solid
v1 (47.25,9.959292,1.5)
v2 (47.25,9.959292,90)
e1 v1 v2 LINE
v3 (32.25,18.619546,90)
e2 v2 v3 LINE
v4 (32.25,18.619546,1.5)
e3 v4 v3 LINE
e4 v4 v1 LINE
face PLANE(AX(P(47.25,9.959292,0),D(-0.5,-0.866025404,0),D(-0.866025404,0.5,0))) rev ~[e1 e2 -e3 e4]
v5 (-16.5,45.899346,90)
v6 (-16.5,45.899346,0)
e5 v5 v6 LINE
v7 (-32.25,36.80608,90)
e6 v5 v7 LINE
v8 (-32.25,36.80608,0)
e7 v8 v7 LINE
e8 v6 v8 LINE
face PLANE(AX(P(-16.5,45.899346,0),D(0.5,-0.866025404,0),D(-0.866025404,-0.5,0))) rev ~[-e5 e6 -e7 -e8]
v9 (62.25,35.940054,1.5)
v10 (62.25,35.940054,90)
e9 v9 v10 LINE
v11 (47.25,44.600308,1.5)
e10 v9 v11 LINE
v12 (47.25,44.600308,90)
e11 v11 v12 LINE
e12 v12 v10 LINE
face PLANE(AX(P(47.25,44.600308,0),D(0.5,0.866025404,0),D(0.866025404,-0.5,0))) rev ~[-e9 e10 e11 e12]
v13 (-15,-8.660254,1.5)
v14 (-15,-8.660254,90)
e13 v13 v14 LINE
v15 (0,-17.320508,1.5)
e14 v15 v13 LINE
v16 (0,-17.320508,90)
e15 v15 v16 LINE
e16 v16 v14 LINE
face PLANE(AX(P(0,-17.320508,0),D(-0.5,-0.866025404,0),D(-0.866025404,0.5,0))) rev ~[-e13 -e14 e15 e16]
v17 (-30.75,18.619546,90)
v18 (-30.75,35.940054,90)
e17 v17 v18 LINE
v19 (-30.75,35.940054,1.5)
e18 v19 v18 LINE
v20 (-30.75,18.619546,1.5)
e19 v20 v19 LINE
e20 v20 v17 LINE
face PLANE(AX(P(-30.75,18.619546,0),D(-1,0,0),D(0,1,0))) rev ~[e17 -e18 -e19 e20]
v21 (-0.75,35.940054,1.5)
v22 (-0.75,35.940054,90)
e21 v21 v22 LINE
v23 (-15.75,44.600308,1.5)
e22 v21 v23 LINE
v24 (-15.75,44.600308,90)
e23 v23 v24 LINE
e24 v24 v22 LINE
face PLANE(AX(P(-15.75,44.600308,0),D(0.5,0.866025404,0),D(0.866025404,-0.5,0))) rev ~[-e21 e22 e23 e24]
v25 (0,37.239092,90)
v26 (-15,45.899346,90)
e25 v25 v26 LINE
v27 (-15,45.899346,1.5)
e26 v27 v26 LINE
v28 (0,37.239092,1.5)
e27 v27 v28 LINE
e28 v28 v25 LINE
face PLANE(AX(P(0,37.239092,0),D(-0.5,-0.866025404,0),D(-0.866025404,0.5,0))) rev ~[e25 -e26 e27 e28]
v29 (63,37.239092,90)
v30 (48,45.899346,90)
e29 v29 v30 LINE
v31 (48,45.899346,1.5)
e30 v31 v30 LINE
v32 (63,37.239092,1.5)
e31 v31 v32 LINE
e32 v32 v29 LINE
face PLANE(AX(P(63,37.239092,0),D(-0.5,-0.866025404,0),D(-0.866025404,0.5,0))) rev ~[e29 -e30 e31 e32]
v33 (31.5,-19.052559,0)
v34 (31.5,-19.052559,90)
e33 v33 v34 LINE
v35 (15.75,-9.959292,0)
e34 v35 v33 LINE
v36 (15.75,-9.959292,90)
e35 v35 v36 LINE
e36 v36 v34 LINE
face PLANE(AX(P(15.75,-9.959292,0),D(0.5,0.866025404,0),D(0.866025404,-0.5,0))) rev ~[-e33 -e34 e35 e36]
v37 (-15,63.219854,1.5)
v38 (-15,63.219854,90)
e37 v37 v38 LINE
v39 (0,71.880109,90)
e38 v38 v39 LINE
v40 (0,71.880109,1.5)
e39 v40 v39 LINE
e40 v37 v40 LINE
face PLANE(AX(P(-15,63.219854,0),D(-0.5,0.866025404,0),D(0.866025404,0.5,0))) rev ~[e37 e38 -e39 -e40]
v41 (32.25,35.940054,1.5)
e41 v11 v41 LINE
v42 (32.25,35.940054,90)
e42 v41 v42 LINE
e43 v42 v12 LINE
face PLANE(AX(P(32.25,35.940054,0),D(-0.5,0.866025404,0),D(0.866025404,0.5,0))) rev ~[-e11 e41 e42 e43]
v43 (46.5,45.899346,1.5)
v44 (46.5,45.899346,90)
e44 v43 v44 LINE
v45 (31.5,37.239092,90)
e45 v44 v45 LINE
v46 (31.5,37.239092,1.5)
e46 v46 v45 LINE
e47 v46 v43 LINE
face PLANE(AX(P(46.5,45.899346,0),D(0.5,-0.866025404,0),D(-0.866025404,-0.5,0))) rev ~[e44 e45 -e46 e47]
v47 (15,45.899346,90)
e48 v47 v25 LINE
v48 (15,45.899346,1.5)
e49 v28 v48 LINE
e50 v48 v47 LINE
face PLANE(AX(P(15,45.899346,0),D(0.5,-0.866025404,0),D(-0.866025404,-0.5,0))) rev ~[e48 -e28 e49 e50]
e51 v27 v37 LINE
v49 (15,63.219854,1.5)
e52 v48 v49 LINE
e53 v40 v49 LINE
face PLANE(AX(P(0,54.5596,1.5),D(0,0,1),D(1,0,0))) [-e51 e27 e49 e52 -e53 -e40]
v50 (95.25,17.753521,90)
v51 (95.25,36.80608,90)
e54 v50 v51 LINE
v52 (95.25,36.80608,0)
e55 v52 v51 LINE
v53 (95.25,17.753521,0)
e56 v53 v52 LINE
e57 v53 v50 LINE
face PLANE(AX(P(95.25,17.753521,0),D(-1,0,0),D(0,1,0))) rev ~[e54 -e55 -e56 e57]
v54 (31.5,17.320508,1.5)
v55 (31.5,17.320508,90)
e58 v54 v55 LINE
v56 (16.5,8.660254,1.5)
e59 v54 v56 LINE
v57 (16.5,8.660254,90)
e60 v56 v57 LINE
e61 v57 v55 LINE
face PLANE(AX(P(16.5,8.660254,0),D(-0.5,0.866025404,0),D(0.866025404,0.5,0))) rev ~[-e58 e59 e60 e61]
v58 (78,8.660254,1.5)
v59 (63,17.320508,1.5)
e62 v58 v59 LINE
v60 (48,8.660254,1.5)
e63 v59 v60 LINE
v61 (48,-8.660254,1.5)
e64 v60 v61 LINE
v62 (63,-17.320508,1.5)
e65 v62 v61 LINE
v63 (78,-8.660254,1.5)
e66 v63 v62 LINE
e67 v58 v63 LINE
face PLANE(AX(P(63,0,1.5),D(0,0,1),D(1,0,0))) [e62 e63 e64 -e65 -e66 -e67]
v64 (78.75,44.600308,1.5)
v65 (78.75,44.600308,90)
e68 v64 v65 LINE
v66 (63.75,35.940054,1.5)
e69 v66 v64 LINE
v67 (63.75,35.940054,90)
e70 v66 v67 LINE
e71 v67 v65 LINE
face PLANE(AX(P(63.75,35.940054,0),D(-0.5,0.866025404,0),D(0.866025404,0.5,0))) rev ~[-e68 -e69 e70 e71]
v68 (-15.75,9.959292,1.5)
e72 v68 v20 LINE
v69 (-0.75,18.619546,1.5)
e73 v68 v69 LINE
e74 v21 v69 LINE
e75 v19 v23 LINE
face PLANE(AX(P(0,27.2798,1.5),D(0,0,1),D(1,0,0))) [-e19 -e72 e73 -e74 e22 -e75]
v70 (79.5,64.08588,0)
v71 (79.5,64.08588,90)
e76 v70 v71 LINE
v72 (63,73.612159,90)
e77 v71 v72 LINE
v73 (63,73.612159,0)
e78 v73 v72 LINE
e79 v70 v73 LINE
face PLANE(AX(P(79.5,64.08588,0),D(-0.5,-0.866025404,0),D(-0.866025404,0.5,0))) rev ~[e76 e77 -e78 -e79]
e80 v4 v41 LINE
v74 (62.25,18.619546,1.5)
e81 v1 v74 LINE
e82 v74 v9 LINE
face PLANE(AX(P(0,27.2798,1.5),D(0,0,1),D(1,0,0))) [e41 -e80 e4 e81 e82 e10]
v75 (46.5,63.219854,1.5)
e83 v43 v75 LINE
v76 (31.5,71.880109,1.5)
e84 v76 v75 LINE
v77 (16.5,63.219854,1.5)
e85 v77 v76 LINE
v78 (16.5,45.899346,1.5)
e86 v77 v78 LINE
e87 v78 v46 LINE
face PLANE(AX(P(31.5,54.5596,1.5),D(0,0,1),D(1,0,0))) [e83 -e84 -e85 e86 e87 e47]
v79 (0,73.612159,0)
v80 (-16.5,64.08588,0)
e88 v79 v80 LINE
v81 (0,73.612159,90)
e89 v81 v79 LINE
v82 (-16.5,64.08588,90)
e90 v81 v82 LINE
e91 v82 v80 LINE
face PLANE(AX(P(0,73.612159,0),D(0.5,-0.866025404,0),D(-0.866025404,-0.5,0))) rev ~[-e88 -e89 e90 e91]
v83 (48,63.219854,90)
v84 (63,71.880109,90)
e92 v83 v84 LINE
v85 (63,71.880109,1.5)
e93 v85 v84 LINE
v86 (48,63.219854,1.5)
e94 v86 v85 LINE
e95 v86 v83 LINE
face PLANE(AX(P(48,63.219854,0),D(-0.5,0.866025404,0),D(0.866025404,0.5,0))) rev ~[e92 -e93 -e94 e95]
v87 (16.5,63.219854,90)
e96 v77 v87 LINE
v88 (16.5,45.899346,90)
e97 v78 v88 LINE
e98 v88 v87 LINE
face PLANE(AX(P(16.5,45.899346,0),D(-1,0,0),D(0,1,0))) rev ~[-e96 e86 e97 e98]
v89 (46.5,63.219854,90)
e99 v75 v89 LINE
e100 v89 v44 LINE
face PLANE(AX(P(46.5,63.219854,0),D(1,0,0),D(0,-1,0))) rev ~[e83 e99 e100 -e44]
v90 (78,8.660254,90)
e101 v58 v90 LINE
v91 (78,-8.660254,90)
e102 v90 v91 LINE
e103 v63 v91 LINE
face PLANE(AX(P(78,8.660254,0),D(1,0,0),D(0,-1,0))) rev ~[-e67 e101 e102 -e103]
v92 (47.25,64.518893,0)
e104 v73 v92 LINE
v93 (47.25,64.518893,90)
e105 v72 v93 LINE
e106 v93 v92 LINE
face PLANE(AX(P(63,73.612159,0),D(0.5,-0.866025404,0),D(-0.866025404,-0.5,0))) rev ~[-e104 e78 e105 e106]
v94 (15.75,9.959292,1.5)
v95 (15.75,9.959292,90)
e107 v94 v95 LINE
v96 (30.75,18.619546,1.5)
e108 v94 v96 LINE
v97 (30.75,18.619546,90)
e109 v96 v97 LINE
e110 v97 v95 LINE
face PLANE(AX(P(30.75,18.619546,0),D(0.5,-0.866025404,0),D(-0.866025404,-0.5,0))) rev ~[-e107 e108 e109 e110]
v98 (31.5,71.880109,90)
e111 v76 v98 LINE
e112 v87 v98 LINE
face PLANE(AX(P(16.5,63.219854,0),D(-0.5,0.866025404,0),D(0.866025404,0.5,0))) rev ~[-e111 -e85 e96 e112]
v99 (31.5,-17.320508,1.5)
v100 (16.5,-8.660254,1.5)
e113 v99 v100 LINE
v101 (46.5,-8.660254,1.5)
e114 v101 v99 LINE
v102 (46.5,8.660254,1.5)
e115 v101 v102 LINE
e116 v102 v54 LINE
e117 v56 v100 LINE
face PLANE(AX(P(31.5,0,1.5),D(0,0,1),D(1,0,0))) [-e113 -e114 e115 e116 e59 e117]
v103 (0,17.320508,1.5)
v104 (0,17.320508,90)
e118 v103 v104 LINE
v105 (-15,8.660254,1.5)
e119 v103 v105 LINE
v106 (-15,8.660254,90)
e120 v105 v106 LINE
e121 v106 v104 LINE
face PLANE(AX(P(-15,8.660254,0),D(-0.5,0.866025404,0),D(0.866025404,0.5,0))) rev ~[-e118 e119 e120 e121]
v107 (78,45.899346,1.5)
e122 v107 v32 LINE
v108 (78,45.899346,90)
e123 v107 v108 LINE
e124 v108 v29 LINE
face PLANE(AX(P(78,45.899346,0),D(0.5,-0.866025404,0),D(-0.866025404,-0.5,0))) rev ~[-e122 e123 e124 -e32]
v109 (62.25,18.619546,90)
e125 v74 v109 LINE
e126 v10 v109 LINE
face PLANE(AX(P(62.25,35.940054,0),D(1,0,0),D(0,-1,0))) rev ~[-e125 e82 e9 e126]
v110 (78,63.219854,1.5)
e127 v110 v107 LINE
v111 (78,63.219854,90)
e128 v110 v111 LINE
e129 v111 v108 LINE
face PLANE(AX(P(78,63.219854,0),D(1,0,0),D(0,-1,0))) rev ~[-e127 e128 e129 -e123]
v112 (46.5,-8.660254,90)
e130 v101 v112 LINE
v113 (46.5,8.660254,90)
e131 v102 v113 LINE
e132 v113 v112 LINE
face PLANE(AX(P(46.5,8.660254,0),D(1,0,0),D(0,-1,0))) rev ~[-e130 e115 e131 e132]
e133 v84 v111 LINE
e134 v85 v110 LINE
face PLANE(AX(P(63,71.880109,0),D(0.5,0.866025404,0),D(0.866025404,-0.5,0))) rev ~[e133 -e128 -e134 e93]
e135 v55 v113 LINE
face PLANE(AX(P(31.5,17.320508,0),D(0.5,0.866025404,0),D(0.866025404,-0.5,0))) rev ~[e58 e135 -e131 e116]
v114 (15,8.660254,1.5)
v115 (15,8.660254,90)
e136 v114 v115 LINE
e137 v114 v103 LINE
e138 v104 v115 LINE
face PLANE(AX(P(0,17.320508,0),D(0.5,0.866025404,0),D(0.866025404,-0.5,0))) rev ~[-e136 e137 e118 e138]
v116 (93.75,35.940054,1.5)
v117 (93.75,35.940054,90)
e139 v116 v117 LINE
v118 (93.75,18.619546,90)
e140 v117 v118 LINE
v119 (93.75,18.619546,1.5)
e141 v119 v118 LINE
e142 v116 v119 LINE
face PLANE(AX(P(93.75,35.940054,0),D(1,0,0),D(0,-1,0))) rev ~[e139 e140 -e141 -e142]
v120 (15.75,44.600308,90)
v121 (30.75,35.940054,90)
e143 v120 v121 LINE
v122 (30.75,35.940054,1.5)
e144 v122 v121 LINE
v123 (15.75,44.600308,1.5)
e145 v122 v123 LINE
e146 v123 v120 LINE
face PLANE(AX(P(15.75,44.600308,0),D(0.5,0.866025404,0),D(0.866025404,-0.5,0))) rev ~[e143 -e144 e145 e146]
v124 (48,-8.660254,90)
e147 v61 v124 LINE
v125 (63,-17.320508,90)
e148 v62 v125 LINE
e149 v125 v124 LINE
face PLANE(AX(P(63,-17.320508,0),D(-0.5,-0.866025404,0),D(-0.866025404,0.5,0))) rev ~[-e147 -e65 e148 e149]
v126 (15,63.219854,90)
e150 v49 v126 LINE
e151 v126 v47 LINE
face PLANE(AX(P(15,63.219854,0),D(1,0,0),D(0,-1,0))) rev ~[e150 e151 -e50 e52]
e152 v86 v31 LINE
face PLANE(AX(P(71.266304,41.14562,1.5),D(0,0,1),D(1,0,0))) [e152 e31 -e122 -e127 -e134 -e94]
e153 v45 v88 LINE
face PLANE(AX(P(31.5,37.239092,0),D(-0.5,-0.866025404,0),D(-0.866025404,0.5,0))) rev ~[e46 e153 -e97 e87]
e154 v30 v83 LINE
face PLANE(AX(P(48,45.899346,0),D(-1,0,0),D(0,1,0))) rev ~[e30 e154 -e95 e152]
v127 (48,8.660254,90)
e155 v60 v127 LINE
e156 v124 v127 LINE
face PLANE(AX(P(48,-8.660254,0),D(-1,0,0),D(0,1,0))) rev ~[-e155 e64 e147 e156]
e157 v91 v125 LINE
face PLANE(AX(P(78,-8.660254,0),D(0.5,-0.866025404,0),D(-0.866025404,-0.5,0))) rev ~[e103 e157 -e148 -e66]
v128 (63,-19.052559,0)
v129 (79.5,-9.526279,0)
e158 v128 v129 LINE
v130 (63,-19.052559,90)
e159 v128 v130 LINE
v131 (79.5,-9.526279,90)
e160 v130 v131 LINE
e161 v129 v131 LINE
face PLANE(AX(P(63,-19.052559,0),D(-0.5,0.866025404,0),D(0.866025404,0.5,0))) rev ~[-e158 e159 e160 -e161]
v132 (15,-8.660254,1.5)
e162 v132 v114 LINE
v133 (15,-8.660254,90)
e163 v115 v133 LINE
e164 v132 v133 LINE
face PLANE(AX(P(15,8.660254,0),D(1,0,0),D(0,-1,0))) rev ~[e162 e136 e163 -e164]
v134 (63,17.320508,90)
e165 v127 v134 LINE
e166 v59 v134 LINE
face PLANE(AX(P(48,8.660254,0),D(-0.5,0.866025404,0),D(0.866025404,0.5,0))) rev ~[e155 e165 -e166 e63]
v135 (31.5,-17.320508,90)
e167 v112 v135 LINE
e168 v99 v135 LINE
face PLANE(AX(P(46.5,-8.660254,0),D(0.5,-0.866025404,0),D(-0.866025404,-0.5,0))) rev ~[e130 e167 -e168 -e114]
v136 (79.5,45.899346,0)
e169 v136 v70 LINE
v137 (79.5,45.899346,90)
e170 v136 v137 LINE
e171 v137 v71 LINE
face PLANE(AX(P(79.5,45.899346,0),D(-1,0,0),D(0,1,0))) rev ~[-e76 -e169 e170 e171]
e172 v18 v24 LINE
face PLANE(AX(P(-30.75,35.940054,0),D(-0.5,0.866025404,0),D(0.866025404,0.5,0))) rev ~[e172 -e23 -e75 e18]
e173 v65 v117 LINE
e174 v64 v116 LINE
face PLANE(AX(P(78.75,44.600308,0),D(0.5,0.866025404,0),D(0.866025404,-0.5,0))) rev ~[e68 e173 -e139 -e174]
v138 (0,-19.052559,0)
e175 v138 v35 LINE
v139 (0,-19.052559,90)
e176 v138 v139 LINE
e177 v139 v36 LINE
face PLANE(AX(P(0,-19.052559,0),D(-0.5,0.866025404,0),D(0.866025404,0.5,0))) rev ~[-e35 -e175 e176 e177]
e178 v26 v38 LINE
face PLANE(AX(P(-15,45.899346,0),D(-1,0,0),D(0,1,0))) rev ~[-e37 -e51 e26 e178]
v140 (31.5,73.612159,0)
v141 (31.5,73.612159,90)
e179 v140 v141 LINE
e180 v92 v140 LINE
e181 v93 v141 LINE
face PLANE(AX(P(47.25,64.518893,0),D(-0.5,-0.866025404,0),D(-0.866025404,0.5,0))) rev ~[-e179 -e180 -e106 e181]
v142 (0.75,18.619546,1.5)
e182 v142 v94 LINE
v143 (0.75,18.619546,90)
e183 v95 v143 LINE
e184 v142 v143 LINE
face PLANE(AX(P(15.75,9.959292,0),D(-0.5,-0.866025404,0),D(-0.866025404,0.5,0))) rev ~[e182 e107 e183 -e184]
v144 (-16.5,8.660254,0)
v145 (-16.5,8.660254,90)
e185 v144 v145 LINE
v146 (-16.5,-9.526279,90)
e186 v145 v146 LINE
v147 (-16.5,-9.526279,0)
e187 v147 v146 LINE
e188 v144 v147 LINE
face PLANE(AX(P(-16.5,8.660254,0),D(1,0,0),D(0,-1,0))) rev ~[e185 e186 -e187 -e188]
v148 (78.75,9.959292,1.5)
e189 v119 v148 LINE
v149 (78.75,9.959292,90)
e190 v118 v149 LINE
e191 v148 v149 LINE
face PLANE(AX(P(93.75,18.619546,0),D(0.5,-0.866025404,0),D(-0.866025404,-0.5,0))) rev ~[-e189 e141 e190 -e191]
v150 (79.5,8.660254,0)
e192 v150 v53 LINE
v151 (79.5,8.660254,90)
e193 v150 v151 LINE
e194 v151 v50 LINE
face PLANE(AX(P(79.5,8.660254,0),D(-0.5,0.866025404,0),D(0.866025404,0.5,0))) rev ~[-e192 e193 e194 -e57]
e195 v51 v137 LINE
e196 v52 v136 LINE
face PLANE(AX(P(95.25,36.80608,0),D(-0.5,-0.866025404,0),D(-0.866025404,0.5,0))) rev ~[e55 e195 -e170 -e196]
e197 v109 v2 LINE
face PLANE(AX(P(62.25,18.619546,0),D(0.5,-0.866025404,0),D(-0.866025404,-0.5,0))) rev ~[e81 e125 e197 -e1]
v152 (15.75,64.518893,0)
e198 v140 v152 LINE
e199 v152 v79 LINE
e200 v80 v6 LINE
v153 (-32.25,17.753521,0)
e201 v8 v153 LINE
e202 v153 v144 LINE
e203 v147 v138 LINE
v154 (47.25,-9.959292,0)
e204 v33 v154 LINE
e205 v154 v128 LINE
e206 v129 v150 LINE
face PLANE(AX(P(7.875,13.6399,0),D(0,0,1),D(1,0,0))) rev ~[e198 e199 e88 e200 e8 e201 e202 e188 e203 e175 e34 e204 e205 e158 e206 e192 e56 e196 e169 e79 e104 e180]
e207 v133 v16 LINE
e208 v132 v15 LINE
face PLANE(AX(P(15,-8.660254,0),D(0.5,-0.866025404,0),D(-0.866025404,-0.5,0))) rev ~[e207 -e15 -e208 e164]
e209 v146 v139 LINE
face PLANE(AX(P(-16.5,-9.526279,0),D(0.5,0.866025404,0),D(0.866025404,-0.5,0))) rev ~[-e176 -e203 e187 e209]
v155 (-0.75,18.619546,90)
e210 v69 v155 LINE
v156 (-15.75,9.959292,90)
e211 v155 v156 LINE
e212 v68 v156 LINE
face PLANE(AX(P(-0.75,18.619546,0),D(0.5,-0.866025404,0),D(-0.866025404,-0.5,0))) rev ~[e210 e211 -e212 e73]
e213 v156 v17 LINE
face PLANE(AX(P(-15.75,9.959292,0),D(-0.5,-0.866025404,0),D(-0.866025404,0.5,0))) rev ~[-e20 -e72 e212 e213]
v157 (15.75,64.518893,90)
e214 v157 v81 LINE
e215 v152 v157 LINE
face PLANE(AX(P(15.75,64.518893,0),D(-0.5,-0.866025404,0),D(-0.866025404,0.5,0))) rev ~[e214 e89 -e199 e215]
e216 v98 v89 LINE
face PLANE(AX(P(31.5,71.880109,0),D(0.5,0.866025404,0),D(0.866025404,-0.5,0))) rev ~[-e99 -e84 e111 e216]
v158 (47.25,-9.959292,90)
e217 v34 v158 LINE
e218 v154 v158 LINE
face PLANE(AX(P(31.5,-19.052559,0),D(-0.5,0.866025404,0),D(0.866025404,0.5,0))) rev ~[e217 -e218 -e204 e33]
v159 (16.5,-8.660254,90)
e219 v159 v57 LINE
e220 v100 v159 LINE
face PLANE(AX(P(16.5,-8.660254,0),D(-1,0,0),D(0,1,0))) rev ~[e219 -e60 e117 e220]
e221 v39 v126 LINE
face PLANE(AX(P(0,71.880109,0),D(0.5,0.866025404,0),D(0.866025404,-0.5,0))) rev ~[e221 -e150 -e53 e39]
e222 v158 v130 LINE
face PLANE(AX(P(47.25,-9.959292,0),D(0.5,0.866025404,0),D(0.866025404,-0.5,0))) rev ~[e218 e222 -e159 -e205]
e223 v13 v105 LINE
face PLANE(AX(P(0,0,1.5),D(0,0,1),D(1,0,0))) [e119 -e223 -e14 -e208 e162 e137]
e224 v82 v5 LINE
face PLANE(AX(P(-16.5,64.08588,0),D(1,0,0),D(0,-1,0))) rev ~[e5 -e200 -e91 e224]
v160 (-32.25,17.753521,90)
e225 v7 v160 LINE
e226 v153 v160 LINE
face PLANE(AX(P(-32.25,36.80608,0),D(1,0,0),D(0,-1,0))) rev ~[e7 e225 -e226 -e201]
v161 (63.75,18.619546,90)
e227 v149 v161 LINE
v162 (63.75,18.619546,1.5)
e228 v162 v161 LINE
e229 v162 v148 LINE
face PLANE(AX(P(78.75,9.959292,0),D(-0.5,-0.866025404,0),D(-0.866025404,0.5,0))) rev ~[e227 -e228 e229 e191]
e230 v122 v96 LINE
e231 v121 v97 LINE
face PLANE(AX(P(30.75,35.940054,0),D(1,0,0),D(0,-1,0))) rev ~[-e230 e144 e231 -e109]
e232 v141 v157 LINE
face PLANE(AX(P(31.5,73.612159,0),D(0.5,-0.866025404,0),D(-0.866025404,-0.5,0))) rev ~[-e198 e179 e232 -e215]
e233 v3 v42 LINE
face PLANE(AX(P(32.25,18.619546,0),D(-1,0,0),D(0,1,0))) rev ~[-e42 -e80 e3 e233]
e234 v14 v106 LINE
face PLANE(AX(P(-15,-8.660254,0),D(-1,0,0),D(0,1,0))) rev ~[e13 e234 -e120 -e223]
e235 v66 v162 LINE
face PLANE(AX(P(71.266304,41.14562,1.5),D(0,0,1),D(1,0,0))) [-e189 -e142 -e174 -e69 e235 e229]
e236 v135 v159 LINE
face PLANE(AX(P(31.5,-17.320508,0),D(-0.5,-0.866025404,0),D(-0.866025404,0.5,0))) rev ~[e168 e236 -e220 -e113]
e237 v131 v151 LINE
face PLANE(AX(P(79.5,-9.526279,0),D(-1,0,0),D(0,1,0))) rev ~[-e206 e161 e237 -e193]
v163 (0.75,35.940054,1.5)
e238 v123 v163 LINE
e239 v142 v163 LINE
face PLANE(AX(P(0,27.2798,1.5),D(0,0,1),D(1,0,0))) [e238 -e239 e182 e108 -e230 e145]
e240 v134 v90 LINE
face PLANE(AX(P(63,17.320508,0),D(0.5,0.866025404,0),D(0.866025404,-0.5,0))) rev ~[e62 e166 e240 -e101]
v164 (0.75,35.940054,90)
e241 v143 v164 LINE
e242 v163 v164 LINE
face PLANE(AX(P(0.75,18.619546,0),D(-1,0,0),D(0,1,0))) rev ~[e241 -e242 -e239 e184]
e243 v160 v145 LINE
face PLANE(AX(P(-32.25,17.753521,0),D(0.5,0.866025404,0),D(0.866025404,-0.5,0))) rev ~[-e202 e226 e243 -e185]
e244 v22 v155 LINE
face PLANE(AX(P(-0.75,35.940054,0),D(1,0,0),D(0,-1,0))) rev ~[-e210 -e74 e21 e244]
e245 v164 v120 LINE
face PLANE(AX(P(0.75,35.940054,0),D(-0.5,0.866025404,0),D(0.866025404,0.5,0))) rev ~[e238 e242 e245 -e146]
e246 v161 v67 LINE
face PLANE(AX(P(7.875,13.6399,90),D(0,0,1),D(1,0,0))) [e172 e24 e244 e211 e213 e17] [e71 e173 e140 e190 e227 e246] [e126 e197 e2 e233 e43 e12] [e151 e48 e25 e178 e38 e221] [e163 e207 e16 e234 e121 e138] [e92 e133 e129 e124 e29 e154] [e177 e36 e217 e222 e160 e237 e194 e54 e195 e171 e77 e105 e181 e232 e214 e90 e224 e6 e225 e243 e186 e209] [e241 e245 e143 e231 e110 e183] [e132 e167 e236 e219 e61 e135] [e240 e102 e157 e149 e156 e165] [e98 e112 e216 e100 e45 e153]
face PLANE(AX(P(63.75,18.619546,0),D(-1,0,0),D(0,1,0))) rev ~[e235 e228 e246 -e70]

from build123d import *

# Parameters (mm, degrees)
F3_DEPTH = 90
F4_DEPTH = 1.5


with BuildPart() as f3:
    # F1 (on Top) → F3 (new body)
    with BuildSketch(Plane.XY):
        Polygon((0.75, 17.7535207776), (0, 17.3205080757), (15, 8.6602540378), (15, 9.5262794416), (15.75, 9.9592921435), (0.75, 18.6195461814), align=None)
        Polygon((-0.75, 17.7535207776), (0, 17.3205080757), (0.75, 17.7535207776), (0.75, 18.6195461814), (0, 19.0525588833), (-0.75, 18.6195461814), align=None)
        Polygon((-15, 8.6602540378), (0, 17.3205080757), (-0.75, 17.7535207776), (-0.75, 18.6195461814), (-15.75, 9.9592921435), (-16.5, 9.5262794416), (-16.5, 8.6602540378), (-15.75, 8.227241336), align=None)
        Polygon((15.75, 8.227241336), (15, 8.6602540378), (15, -8.6602540378), (15, -9.5262794416), (15.75, -9.9592921435), (16.5, -9.5262794416), (16.5, -8.6602540378), (16.5, 8.6602540378), align=None)
        Polygon((15, 9.5262794416), (15, 8.6602540378), (15.75, 8.227241336), (16.5, 8.6602540378), (16.5, 9.5262794416), (15.75, 9.9592921435), align=None)
        Polygon((-15, -8.6602540378), (-15, 8.6602540378), (-15.75, 8.227241336), (-16.5, 8.6602540378), (-16.5, -9.5262794416), (0, -19.0525588833), (15.75, -9.9592921435), (15, -9.5262794416), (15, -8.6602540378), (0, -17.3205080757), align=None)
        Polygon((0, 19.0525588833), (0.75, 18.6195461814), (0.75, 35.9400542571), (0, 35.5070415552), (-0.75, 35.9400542571), (-0.75, 18.6195461814), align=None)
        Polygon((30.75, 18.6195461814), (15.75, 9.9592921435), (16.5, 9.5262794416), (16.5, 8.6602540378), (31.5, 17.3205080757), (30.75, 17.7535207776), align=None)
        Polygon((-32.25, 17.7535207776), (-16.5, 8.6602540378), (-16.5, 9.5262794416), (-15.75, 9.9592921435), (-30.75, 18.6195461814), (-30.75, 35.9400542571), (-15.75, 44.6003082949), (-16.5, 45.0333209968), (-16.5, 45.8993464006), (-32.25, 36.8060796608), align=None)
        Polygon((0, 35.5070415552), (0.75, 35.9400542571), (0.75, 36.8060796608), (0, 37.2390923627), (-0.75, 36.8060796608), (-0.75, 35.9400542571), align=None)
        Polygon((0.75, 36.8060796608), (0.75, 35.9400542571), (15.75, 44.6003082949), (15, 45.0333209968), (15, 45.8993464006), (0, 37.2390923627), align=None)
        Polygon((-15.75, 44.6003082949), (-0.75, 35.9400542571), (-0.75, 36.8060796608), (0, 37.2390923627), (-15, 45.8993464006), (-15.75, 46.3323591025), (-16.5, 45.8993464006), (-16.5, 45.0333209968), align=None)
        Polygon((16.5, -9.5262794416), (15.75, -9.9592921435), (31.5, -19.0525588833), (47.25, -9.9592921435), (46.5, -9.5262794416), (46.5, -8.6602540378), (31.5, -17.3205080757), (16.5, -8.6602540378), align=None)
        Polygon((30.75, 35.9400542571), (30.75, 18.6195461814), (31.5, 19.0525588833), (32.25, 18.6195461814), (32.25, 35.9400542571), (31.5, 35.5070415552), align=None)
        Polygon((31.5, 19.0525588833), (30.75, 18.6195461814), (30.75, 17.7535207776), (31.5, 17.3205080757), (32.25, 17.7535207776), (32.25, 18.6195461814), align=None)
        Polygon((32.25, 17.7535207776), (31.5, 17.3205080757), (46.5, 8.6602540378), (46.5, 9.5262794416), (47.25, 9.9592921435), (32.25, 18.6195461814), align=None)
        Polygon((16.5, 45.0333209968), (15.75, 44.6003082949), (30.75, 35.9400542571), (30.75, 36.8060796608), (31.5, 37.2390923627), (16.5, 45.8993464006), align=None)
        Polygon((15, 45.0333209968), (15.75, 44.6003082949), (16.5, 45.0333209968), (16.5, 45.8993464006), (15.75, 46.3323591025), (15, 45.8993464006), align=None)
        Polygon((30.75, 36.8060796608), (30.75, 35.9400542571), (31.5, 35.5070415552), (32.25, 35.9400542571), (32.25, 36.8060796608), (31.5, 37.2390923627), align=None)
        Polygon((47.25, 8.227241336), (46.5, 8.6602540378), (46.5, -8.6602540378), (46.5, -9.5262794416), (47.25, -9.9592921435), (48, -9.5262794416), (48, -8.6602540378), (48, 8.6602540378), align=None)
        Polygon((46.5, 9.5262794416), (46.5, 8.6602540378), (47.25, 8.227241336), (48, 8.6602540378), (48, 9.5262794416), (47.25, 9.9592921435), align=None)
        Polygon((48, -9.5262794416), (47.25, -9.9592921435), (63, -19.0525588833), (79.5, -9.5262794416), (79.5, 8.6602540378), (78.75, 8.227241336), (78, 8.6602540378), (78, -8.6602540378), (63, -17.3205080757), (48, -8.6602540378), align=None)
        Polygon((-16.5, 64.08587988), (-16.5, 45.8993464006), (-15.75, 46.3323591025), (-15, 45.8993464006), (-15, 63.2198544763), (0, 71.8801085141), (15, 63.2198544763), (15, 64.08587988), (15.75, 64.5188925819), (0, 73.6121593217), align=None)
        Polygon((15, 63.2198544763), (15, 45.8993464006), (15.75, 46.3323591025), (16.5, 45.8993464006), (16.5, 63.2198544763), (16.5, 64.08587988), (15.75, 64.5188925819), (15, 64.08587988), align=None)
        Polygon((62.25, 18.6195461814), (47.25, 9.9592921435), (48, 9.5262794416), (48, 8.6602540378), (63, 17.3205080757), (62.25, 17.7535207776), align=None)
        Polygon((32.25, 36.8060796608), (32.25, 35.9400542571), (47.25, 44.6003082949), (46.5, 45.0333209968), (46.5, 45.8993464006), (31.5, 37.2390923627), align=None)
        Polygon((16.5, 64.08587988), (16.5, 63.2198544763), (31.5, 71.8801085141), (46.5, 63.2198544763), (46.5, 64.08587988), (47.25, 64.5188925819), (31.5, 73.6121593217), (15.75, 64.5188925819), align=None)
        Polygon((62.25, 35.9400542571), (62.25, 18.6195461814), (63, 19.0525588833), (63.75, 18.6195461814), (63.75, 35.9400542571), (63, 35.5070415552), align=None)
        Polygon((63, 19.0525588833), (62.25, 18.6195461814), (62.25, 17.7535207776), (63, 17.3205080757), (63.75, 17.7535207776), (63.75, 18.6195461814), align=None)
        Polygon((48, 45.0333209968), (47.25, 44.6003082949), (62.25, 35.9400542571), (62.25, 36.8060796608), (63, 37.2390923627), (48, 45.8993464006), align=None)
        Polygon((46.5, 45.0333209968), (47.25, 44.6003082949), (48, 45.0333209968), (48, 45.8993464006), (47.25, 46.3323591025), (46.5, 45.8993464006), align=None)
        Polygon((46.5, 63.2198544763), (46.5, 45.8993464006), (47.25, 46.3323591025), (48, 45.8993464006), (48, 63.2198544763), (48, 64.08587988), (47.25, 64.5188925819), (46.5, 64.08587988), align=None)
        Polygon((63.75, 17.7535207776), (63, 17.3205080757), (78, 8.6602540378), (78.75, 8.227241336), (79.5, 8.6602540378), (79.5, 9.5262794416), (78.75, 9.9592921435), (63.75, 18.6195461814), align=None)
        Polygon((79.5, 9.5262794416), (79.5, 8.6602540378), (95.25, 17.7535207776), (95.25, 36.8060796608), (79.5, 45.8993464006), (79.5, 45.0333209968), (78.75, 44.6003082949), (93.75, 35.9400542571), (93.75, 18.6195461814), (78.75, 9.9592921435), align=None)
        Polygon((62.25, 36.8060796608), (62.25, 35.9400542571), (63, 35.5070415552), (63.75, 35.9400542571), (63.75, 36.8060796608), (63, 37.2390923627), align=None)
        Polygon((63.75, 36.8060796608), (63.75, 35.9400542571), (78.75, 44.6003082949), (79.5, 45.0333209968), (79.5, 45.8993464006), (78.75, 46.3323591025), (78, 45.8993464006), (63, 37.2390923627), align=None)
        Polygon((48, 64.08587988), (48, 63.2198544763), (63, 71.8801085141), (78, 63.2198544763), (78, 45.8993464006), (78.75, 46.3323591025), (79.5, 45.8993464006), (79.5, 64.08587988), (63, 73.6121593217), (47.25, 64.5188925819), align=None)
    extrude(amount=F3_DEPTH)

    # F1 (on Top) → F4 (join)
    with BuildSketch(Plane.XY):
        Polygon((0, 19.0525588833), (0.75, 18.6195461814), (0.75, 35.9400542571), (0, 35.5070415552), (-0.75, 35.9400542571), (-0.75, 18.6195461814), align=None)
        Polygon((30.75, 35.9400542571), (30.75, 18.6195461814), (31.5, 19.0525588833), (32.25, 18.6195461814), (32.25, 35.9400542571), (31.5, 35.5070415552), align=None)
        Polygon((16.5, 63.2198544763), (16.5, 45.8993464006), (31.5, 37.2390923627), (46.5, 45.8993464006), (46.5, 63.2198544763), (31.5, 71.8801085141), align=None)
        Polygon((-15.75, 9.9592921435), (-0.75, 18.6195461814), (-0.75, 35.9400542571), (-15.75, 44.6003082949), (-30.75, 35.9400542571), (-30.75, 18.6195461814), align=None)
        Polygon((-15, 45.8993464006), (0, 37.2390923627), (15, 45.8993464006), (15, 63.2198544763), (0, 71.8801085141), (-15, 63.2198544763), align=None)
        Polygon((15, 8.6602540378), (0, 17.3205080757), (-15, 8.6602540378), (-15, -8.6602540378), (0, -17.3205080757), (15, -8.6602540378), align=None)
        Polygon((63.75, 36.8060796608), (63.75, 35.9400542571), (78.75, 44.6003082949), (79.5, 45.0333209968), (79.5, 45.8993464006), (78.75, 46.3323591025), (78, 45.8993464006), (63, 37.2390923627), align=None)
        Polygon((31.5, 17.3205080757), (16.5, 8.6602540378), (16.5, -8.6602540378), (31.5, -17.3205080757), (46.5, -8.6602540378), (46.5, 8.6602540378), align=None)
        Polygon((63, 17.3205080757), (48, 8.6602540378), (48, -8.6602540378), (63, -17.3205080757), (78, -8.6602540378), (78, 8.6602540378), align=None)
        Polygon((63.75, 35.9400542571), (63.75, 18.6195461814), (78.75, 9.9592921435), (93.75, 18.6195461814), (93.75, 35.9400542571), (78.75, 44.6003082949), align=None)
        Polygon((48, 64.08587988), (48, 63.2198544763), (63, 71.8801085141), (78, 63.2198544763), (78, 45.8993464006), (78.75, 46.3323591025), (79.5, 45.8993464006), (79.5, 64.08587988), (63, 73.6121593217), (47.25, 64.5188925819), align=None)
        Polygon((16.5, 64.08587988), (16.5, 63.2198544763), (31.5, 71.8801085141), (46.5, 63.2198544763), (46.5, 64.08587988), (47.25, 64.5188925819), (31.5, 73.6121593217), (15.75, 64.5188925819), align=None)
        Polygon((-15, -8.6602540378), (-15, 8.6602540378), (-15.75, 8.227241336), (-16.5, 8.6602540378), (-16.5, -9.5262794416), (0, -19.0525588833), (15.75, -9.9592921435), (15, -9.5262794416), (15, -8.6602540378), (0, -17.3205080757), align=None)
        Polygon((-32.25, 17.7535207776), (-16.5, 8.6602540378), (-16.5, 9.5262794416), (-15.75, 9.9592921435), (-30.75, 18.6195461814), (-30.75, 35.9400542571), (-15.75, 44.6003082949), (-16.5, 45.0333209968), (-16.5, 45.8993464006), (-32.25, 36.8060796608), align=None)
        Polygon((16.5, -9.5262794416), (15.75, -9.9592921435), (31.5, -19.0525588833), (47.25, -9.9592921435), (46.5, -9.5262794416), (46.5, -8.6602540378), (31.5, -17.3205080757), (16.5, -8.6602540378), align=None)
        Polygon((48, -9.5262794416), (47.25, -9.9592921435), (63, -19.0525588833), (79.5, -9.5262794416), (79.5, 8.6602540378), (78.75, 8.227241336), (78, 8.6602540378), (78, -8.6602540378), (63, -17.3205080757), (48, -8.6602540378), align=None)
        Polygon((79.5, 9.5262794416), (79.5, 8.6602540378), (95.25, 17.7535207776), (95.25, 36.8060796608), (79.5, 45.8993464006), (79.5, 45.0333209968), (78.75, 44.6003082949), (93.75, 35.9400542571), (93.75, 18.6195461814), (78.75, 9.9592921435), align=None)
        Polygon((-16.5, 64.08587988), (-16.5, 45.8993464006), (-15.75, 46.3323591025), (-15, 45.8993464006), (-15, 63.2198544763), (0, 71.8801085141), (15, 63.2198544763), (15, 64.08587988), (15.75, 64.5188925819), (0, 73.6121593217), align=None)
        Polygon((48, 63.2198544763), (48, 45.8993464006), (63, 37.2390923627), (78, 45.8993464006), (78, 63.2198544763), (63, 71.8801085141), align=None)
        Polygon((0.75, 35.9400542571), (0.75, 18.6195461814), (15.75, 9.9592921435), (30.75, 18.6195461814), (30.75, 35.9400542571), (15.75, 44.6003082949), align=None)
        Polygon((32.25, 35.9400542571), (32.25, 18.6195461814), (47.25, 9.9592921435), (62.25, 18.6195461814), (62.25, 35.9400542571), (47.25, 44.6003082949), align=None)
        Polygon((46.5, 45.0333209968), (47.25, 44.6003082949), (48, 45.0333209968), (48, 45.8993464006), (47.25, 46.3323591025), (46.5, 45.8993464006), align=None)
        Polygon((15, 45.0333209968), (15.75, 44.6003082949), (16.5, 45.0333209968), (16.5, 45.8993464006), (15.75, 46.3323591025), (15, 45.8993464006), align=None)
        Polygon((62.25, 36.8060796608), (62.25, 35.9400542571), (63, 35.5070415552), (63.75, 35.9400542571), (63.75, 36.8060796608), (63, 37.2390923627), align=None)
        Polygon((-0.75, 17.7535207776), (0, 17.3205080757), (0.75, 17.7535207776), (0.75, 18.6195461814), (0, 19.0525588833), (-0.75, 18.6195461814), align=None)
        Polygon((15, 9.5262794416), (15, 8.6602540378), (15.75, 8.227241336), (16.5, 8.6602540378), (16.5, 9.5262794416), (15.75, 9.9592921435), align=None)
        Polygon((31.5, 19.0525588833), (30.75, 18.6195461814), (30.75, 17.7535207776), (31.5, 17.3205080757), (32.25, 17.7535207776), (32.25, 18.6195461814), align=None)
        Polygon((46.5, 9.5262794416), (46.5, 8.6602540378), (47.25, 8.227241336), (48, 8.6602540378), (48, 9.5262794416), (47.25, 9.9592921435), align=None)
        Polygon((63, 19.0525588833), (62.25, 18.6195461814), (62.25, 17.7535207776), (63, 17.3205080757), (63.75, 17.7535207776), (63.75, 18.6195461814), align=None)
        Polygon((0, 35.5070415552), (0.75, 35.9400542571), (0.75, 36.8060796608), (0, 37.2390923627), (-0.75, 36.8060796608), (-0.75, 35.9400542571), align=None)
        Polygon((30.75, 36.8060796608), (30.75, 35.9400542571), (31.5, 35.5070415552), (32.25, 35.9400542571), (32.25, 36.8060796608), (31.5, 37.2390923627), align=None)
    extrude(amount=F4_DEPTH)


solid = f3.part
